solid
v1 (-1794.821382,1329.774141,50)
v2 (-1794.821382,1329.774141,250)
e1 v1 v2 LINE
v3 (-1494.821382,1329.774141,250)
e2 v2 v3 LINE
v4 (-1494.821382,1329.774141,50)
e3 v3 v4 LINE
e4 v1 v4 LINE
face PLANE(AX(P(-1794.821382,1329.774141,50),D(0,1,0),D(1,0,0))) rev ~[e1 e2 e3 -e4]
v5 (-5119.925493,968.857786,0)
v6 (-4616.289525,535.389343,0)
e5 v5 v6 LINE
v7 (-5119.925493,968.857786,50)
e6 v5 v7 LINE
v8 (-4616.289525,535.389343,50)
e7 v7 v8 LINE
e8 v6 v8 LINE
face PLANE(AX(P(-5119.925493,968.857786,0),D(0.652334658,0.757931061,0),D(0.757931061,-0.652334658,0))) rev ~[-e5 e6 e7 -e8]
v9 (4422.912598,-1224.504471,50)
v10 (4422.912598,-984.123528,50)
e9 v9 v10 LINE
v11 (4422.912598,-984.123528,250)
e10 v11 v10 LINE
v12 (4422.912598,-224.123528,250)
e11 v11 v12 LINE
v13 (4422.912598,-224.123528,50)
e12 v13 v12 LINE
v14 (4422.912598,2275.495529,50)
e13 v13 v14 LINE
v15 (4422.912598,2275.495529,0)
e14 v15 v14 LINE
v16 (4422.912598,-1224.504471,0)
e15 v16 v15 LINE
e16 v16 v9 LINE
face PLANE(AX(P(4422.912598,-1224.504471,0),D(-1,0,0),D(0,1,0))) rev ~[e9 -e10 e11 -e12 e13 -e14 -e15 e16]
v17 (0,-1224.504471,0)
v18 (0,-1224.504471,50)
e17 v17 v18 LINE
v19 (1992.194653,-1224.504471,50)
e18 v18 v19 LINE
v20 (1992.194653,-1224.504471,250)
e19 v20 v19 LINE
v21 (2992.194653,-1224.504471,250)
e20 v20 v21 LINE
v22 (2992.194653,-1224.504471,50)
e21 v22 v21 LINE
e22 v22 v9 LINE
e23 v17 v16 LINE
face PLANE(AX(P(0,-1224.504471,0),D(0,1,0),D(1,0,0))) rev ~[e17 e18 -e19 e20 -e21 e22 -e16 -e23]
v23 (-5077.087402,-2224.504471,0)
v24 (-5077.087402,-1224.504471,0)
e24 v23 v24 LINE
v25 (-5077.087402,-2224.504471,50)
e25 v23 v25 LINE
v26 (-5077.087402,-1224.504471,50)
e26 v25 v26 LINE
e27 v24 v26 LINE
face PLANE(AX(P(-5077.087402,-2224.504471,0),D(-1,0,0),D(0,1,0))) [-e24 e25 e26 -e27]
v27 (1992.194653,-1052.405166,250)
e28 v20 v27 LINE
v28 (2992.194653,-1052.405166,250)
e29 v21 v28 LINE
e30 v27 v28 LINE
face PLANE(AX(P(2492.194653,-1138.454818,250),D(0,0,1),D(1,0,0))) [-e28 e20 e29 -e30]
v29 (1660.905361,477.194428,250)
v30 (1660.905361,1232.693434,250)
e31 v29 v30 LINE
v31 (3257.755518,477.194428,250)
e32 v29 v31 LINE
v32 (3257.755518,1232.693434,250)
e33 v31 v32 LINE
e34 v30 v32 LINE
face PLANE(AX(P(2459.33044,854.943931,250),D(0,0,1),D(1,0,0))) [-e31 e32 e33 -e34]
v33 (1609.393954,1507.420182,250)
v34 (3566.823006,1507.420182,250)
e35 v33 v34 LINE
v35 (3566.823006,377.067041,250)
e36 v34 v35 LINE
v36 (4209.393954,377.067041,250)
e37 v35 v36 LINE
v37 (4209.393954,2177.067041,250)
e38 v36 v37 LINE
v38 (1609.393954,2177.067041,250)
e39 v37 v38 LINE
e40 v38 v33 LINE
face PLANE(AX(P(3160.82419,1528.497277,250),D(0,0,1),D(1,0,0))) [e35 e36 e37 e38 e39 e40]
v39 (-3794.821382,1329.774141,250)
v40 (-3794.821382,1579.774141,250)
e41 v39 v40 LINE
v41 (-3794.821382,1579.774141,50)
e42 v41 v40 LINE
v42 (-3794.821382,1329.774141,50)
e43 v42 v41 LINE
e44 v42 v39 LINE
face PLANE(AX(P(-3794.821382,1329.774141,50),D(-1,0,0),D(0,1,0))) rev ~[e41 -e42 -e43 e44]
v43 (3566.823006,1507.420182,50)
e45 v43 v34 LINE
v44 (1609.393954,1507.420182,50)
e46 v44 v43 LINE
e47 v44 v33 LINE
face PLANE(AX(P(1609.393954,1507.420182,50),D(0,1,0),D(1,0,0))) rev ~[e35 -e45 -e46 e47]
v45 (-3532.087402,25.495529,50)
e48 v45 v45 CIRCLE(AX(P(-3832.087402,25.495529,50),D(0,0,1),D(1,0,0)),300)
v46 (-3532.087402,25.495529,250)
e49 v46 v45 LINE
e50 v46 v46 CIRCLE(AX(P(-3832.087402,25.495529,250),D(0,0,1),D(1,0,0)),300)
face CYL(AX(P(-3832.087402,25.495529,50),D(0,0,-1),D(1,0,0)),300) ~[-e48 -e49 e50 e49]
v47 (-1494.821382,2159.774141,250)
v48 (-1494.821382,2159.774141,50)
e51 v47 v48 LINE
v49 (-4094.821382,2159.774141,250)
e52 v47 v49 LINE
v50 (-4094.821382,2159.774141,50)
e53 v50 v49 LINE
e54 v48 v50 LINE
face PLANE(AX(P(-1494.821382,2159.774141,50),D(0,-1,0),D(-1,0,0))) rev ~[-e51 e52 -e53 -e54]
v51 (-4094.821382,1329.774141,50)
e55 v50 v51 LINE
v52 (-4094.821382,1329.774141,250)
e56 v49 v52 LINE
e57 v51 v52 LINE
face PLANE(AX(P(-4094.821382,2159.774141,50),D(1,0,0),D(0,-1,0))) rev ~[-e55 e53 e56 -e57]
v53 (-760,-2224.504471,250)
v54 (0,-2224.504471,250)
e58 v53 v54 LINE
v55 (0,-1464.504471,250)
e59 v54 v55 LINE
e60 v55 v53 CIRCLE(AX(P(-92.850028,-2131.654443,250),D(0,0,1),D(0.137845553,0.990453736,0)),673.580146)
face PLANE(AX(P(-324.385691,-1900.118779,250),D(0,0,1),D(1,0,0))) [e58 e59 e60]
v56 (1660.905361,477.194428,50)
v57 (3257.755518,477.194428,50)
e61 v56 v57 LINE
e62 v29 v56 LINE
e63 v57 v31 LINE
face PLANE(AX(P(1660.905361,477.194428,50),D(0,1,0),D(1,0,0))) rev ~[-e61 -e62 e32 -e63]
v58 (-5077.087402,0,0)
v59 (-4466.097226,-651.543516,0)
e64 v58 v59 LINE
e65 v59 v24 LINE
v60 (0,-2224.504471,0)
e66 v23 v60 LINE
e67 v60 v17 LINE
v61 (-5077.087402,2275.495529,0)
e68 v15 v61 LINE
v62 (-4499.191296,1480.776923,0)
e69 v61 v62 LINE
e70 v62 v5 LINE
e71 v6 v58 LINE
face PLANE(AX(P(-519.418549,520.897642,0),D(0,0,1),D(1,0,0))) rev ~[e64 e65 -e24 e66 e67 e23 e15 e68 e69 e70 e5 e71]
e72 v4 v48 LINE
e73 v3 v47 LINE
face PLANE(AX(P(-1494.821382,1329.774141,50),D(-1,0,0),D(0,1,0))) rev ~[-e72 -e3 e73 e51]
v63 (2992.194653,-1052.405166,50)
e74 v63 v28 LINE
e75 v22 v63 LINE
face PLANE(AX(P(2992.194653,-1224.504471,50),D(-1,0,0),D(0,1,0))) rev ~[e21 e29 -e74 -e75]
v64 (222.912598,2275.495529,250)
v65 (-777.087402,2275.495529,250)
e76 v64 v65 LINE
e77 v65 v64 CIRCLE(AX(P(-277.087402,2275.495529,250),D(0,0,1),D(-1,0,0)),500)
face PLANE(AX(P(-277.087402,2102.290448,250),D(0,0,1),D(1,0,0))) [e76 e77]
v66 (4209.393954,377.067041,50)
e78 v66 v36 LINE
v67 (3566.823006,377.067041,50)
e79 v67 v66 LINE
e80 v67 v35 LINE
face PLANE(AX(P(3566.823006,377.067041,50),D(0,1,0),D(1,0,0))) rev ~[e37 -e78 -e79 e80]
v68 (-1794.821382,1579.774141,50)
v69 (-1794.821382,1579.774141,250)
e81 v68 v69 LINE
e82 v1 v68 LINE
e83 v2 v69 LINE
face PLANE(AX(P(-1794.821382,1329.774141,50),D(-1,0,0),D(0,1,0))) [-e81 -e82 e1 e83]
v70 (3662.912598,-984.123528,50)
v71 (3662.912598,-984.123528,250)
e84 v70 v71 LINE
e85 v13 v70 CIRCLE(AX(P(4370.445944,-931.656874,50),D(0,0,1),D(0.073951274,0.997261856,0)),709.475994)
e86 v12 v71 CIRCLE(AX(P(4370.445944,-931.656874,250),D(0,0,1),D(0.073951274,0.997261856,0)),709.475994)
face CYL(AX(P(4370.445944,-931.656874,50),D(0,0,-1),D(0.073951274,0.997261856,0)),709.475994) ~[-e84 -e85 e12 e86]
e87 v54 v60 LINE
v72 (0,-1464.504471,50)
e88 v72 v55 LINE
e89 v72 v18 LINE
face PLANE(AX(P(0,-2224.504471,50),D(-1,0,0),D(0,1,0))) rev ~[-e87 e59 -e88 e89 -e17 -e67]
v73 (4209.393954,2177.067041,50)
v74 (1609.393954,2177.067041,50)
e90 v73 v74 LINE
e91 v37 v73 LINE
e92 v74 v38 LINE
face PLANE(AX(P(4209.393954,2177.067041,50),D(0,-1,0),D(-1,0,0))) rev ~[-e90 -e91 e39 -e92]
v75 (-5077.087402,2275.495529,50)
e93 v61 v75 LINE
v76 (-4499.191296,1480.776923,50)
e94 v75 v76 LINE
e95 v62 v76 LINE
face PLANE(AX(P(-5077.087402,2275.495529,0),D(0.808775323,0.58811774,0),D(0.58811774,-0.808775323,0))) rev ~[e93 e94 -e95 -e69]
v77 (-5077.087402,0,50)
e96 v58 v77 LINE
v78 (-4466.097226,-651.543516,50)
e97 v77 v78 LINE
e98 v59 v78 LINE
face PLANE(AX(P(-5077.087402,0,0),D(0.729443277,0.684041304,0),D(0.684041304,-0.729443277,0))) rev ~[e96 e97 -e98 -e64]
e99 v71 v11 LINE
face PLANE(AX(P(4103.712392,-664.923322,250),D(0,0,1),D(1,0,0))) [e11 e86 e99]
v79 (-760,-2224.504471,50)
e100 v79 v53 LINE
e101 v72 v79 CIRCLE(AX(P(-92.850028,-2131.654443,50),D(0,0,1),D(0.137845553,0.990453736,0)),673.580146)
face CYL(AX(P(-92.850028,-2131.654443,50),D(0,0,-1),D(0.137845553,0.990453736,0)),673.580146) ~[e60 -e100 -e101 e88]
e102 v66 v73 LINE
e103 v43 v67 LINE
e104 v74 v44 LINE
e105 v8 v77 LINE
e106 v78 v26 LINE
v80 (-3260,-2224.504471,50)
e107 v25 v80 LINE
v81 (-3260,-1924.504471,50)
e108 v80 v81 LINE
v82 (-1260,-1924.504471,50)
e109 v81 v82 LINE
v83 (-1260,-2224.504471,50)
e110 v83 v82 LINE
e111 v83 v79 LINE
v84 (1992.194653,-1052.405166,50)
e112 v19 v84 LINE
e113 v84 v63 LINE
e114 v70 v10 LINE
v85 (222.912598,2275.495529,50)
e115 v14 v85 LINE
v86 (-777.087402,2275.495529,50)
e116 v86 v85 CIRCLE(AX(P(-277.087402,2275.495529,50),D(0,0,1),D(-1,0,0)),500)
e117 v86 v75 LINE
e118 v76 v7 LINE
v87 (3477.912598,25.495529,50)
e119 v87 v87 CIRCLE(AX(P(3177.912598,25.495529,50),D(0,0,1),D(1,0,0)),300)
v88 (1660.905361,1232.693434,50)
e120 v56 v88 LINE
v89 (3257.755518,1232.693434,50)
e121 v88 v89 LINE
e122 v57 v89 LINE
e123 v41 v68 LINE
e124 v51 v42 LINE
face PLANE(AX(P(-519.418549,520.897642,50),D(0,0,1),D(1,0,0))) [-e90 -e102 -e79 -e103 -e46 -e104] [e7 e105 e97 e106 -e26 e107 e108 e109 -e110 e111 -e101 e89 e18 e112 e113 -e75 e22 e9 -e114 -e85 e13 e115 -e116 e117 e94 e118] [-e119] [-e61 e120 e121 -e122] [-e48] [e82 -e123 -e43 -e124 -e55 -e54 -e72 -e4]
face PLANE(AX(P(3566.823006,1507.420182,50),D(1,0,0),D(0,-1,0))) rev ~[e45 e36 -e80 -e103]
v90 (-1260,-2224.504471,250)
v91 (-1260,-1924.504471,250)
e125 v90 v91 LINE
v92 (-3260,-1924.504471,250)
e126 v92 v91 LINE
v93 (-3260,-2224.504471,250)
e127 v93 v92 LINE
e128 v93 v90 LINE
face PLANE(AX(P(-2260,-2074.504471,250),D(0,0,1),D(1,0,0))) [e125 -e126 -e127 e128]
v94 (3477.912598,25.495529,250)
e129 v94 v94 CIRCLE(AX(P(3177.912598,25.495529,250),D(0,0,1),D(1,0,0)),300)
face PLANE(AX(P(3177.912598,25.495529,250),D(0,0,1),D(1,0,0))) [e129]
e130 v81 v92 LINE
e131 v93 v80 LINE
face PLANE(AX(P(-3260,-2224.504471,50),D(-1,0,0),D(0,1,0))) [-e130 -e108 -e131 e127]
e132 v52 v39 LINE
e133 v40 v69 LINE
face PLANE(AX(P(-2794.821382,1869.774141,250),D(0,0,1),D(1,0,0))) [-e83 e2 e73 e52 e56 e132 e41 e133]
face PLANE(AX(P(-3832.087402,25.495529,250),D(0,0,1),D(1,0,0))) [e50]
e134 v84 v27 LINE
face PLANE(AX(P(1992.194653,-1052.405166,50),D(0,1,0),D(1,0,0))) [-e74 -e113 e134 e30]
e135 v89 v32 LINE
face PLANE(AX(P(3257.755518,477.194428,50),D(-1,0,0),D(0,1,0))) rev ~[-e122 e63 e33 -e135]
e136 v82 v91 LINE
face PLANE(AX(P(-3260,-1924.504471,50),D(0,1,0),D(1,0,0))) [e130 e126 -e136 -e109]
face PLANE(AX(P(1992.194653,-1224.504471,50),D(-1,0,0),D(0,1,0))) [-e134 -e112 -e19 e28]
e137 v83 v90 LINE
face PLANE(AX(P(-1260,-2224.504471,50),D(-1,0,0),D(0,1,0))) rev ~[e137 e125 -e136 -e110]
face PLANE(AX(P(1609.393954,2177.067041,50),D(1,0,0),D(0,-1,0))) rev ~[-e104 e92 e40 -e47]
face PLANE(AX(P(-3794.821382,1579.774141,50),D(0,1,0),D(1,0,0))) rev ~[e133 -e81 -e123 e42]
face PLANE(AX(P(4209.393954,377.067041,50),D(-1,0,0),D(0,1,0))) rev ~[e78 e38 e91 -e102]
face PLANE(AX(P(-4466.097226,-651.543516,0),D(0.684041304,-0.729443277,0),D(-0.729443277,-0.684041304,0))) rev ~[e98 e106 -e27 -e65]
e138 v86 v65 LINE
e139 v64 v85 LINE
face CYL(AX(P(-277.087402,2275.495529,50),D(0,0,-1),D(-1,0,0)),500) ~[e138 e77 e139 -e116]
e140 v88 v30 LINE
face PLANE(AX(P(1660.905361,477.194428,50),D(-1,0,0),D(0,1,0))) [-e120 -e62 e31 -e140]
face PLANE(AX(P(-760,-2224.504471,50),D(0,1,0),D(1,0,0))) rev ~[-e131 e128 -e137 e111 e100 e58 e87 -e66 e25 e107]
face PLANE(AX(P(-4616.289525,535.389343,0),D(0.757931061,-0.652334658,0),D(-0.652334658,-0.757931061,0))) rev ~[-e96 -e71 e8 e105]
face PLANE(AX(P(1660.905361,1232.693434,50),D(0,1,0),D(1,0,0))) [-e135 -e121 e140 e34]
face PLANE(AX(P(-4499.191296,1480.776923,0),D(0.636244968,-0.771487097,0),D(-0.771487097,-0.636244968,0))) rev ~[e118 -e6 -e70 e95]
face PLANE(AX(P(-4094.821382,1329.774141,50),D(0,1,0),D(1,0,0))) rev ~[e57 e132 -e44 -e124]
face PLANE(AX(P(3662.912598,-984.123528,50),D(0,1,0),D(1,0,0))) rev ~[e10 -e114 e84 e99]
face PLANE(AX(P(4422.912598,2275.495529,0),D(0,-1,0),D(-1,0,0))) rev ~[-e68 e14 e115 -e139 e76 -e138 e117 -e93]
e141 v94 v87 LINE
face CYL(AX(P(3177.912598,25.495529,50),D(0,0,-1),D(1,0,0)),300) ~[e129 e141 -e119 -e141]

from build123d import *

# Parameters (mm, degrees)
F0_W      = 5077.0874023438
F0_H      = 1000
F1_DEPTH  = 50
F2_W      = 300
F2_H      = 250
F2_W_2    = 1596.8501567841
F2_H_2    = 755.4990053177
F2_W_3    = 1000
F2_H_3    = 172.0993051472
F2_W_4    = 2000
F2_H_4    = 300
F2_R      = 300
F3_DEPTH  = 200
F4_DEPTH  = 200
F5_DEPTH  = 200
F6_DEPTH  = 200
F7_DEPTH  = 200
F8_DEPTH  = 200
F10_DEPTH = 25


# Not quite as in the source:
# - the program builds the solid bodies; features that only make, move or delete a surface that nothing else refers to are left out


with BuildPart() as f1:
    # F0 (on Top) → F1 (new body)
    with BuildSketch(Plane.XY):
        Polygon((-777.0874023438, 2275.4955291748), (-5077.0874023438, 2275.4955291748), (-4499.191295666, 1480.7769234966), (-5119.9254926672, 968.8577861197), (-4616.2895248949, 535.3893431642), (-5077.0874023438, 0), (-4466.0972264549, -651.5435160618), (-5077.0874023438, -1224.5044708252), (0, -1224.5044708252), (4422.9125976562, -1224.5044708252), (4422.9125976562, 2275.4955291748), (222.9125976562, 2275.4955291748), align=None)
        with Locations((-2538.5437011719, -1724.5044708252)):
            Rectangle(F0_W, F0_H)
    extrude(amount=F1_DEPTH)

    # F2 (on face) → F3 (join)
    with BuildSketch(Plane.XY.offset(50)):
        Polygon((-1494.8213815689, 2159.7741413116), (-4094.8213815689, 2159.7741413116), (-4094.8213815689, 1579.7741413116), (-3794.8213815689, 1579.7741413116), (-1794.8213815689, 1579.7741413116), (-1494.8213815689, 1579.7741413116), align=None)
        with Locations((-3944.8213815689, 1454.7741413116)):
            Rectangle(F2_W, F2_H)
        with Locations((-1644.8213815689, 1454.7741413116)):
            Rectangle(F2_W, F2_H)
        Polygon((4209.393954277, 2177.0670413971), (1609.393954277, 2177.0670413971), (1609.393954277, 1507.4201822281), (3566.8230056763, 1507.4201822281), (3566.8230056763, 377.0670413971), (4209.393954277, 377.0670413971), align=None)
        with Locations((2459.3304395676, 854.9439311028)):
            Rectangle(F2_W_2, F2_H_2)
        with Locations((2492.1946525574, -1138.4548182516)):
            Rectangle(F2_W_3, F2_H_3)
        with BuildLine():
            Line((222.9125976562, 2275.4955291748), (-777.0874023438, 2275.4955291748))
            ThreePointArc((-777.0874023438, 2275.4955291748), (-277.0874023438, 1775.4955291748), (222.9125976562, 2275.4955291748))
        make_face()
        with BuildLine():
            Line((3662.9125976562, -984.1235280037), (4422.9125976562, -984.1235280037))
            Line((4422.9125976562, -984.1235280037), (4422.9125976562, -224.1235280037))
            ThreePointArc((4422.9125976562, -224.1235280037), (3868.7706575404, -429.9815878879), (3662.9125976562, -984.1235280037))
        make_face()
        with Locations((-2260, -2074.5044708252)):
            Rectangle(F2_W_4, F2_H_4)
        with BuildLine():
            Line((-760, -2224.5044708252), (0, -2224.5044708252))
            Line((0, -2224.5044708252), (0, -1464.5044708252))
            ThreePointArc((0, -1464.5044708252), (-569.1431166961, -1655.361354129), (-760, -2224.5044708252))
        make_face()
        with Locations((-3832.0874023438, 25.4955291748)):
            Circle(F2_R)
        with Locations((3177.9125976562, 25.4955291748)):
            Circle(F2_R)
    extrude(amount=F3_DEPTH)

    # F2 (on face) → F4 (join)
    with BuildSketch(Plane.XY.offset(50)):
        Polygon((-1494.8213815689, 2159.7741413116), (-4094.8213815689, 2159.7741413116), (-4094.8213815689, 1579.7741413116), (-3794.8213815689, 1579.7741413116), (-1794.8213815689, 1579.7741413116), (-1494.8213815689, 1579.7741413116), align=None)
        with Locations((-3944.8213815689, 1454.7741413116)):
            Rectangle(F2_W, F2_H)
        with Locations((-1644.8213815689, 1454.7741413116)):
            Rectangle(F2_W, F2_H)
        Polygon((4209.393954277, 2177.0670413971), (1609.393954277, 2177.0670413971), (1609.393954277, 1507.4201822281), (3566.8230056763, 1507.4201822281), (3566.8230056763, 377.0670413971), (4209.393954277, 377.0670413971), align=None)
        with Locations((2459.3304395676, 854.9439311028)):
            Rectangle(F2_W_2, F2_H_2)
        with Locations((2492.1946525574, -1138.4548182516)):
            Rectangle(F2_W_3, F2_H_3)
        with BuildLine():
            Line((222.9125976562, 2275.4955291748), (-777.0874023438, 2275.4955291748))
            ThreePointArc((-777.0874023438, 2275.4955291748), (-277.0874023438, 1775.4955291748), (222.9125976562, 2275.4955291748))
        make_face()
        with BuildLine():
            Line((3662.9125976562, -984.1235280037), (4422.9125976562, -984.1235280037))
            Line((4422.9125976562, -984.1235280037), (4422.9125976562, -224.1235280037))
            ThreePointArc((4422.9125976562, -224.1235280037), (3868.7706575404, -429.9815878879), (3662.9125976562, -984.1235280037))
        make_face()
        with Locations((-2260, -2074.5044708252)):
            Rectangle(F2_W_4, F2_H_4)
        with BuildLine():
            Line((-760, -2224.5044708252), (0, -2224.5044708252))
            Line((0, -2224.5044708252), (0, -1464.5044708252))
            ThreePointArc((0, -1464.5044708252), (-569.1431166961, -1655.361354129), (-760, -2224.5044708252))
        make_face()
        with Locations((-3832.0874023438, 25.4955291748)):
            Circle(F2_R)
        with Locations((3177.9125976562, 25.4955291748)):
            Circle(F2_R)
    extrude(amount=F4_DEPTH)

    # F2 (on face) → F5 (join)
    with BuildSketch(Plane.XY.offset(50)):
        Polygon((-1494.8213815689, 2159.7741413116), (-4094.8213815689, 2159.7741413116), (-4094.8213815689, 1579.7741413116), (-3794.8213815689, 1579.7741413116), (-1794.8213815689, 1579.7741413116), (-1494.8213815689, 1579.7741413116), align=None)
        with Locations((-3944.8213815689, 1454.7741413116)):
            Rectangle(F2_W, F2_H)
        with Locations((-1644.8213815689, 1454.7741413116)):
            Rectangle(F2_W, F2_H)
        Polygon((4209.393954277, 2177.0670413971), (1609.393954277, 2177.0670413971), (1609.393954277, 1507.4201822281), (3566.8230056763, 1507.4201822281), (3566.8230056763, 377.0670413971), (4209.393954277, 377.0670413971), align=None)
        with Locations((2459.3304395676, 854.9439311028)):
            Rectangle(F2_W_2, F2_H_2)
        with Locations((2492.1946525574, -1138.4548182516)):
            Rectangle(F2_W_3, F2_H_3)
        with BuildLine():
            Line((222.9125976562, 2275.4955291748), (-777.0874023438, 2275.4955291748))
            ThreePointArc((-777.0874023438, 2275.4955291748), (-277.0874023438, 1775.4955291748), (222.9125976562, 2275.4955291748))
        make_face()
        with BuildLine():
            Line((3662.9125976562, -984.1235280037), (4422.9125976562, -984.1235280037))
            Line((4422.9125976562, -984.1235280037), (4422.9125976562, -224.1235280037))
            ThreePointArc((4422.9125976562, -224.1235280037), (3868.7706575404, -429.9815878879), (3662.9125976562, -984.1235280037))
        make_face()
        with Locations((-2260, -2074.5044708252)):
            Rectangle(F2_W_4, F2_H_4)
        with BuildLine():
            Line((-760, -2224.5044708252), (0, -2224.5044708252))
            Line((0, -2224.5044708252), (0, -1464.5044708252))
            ThreePointArc((0, -1464.5044708252), (-569.1431166961, -1655.361354129), (-760, -2224.5044708252))
        make_face()
        with Locations((-3832.0874023438, 25.4955291748)):
            Circle(F2_R)
        with Locations((3177.9125976562, 25.4955291748)):
            Circle(F2_R)
    extrude(amount=F5_DEPTH)

    # F2 (on face) → F6 (join)
    with BuildSketch(Plane.XY.offset(50)):
        Polygon((-1494.8213815689, 2159.7741413116), (-4094.8213815689, 2159.7741413116), (-4094.8213815689, 1579.7741413116), (-3794.8213815689, 1579.7741413116), (-1794.8213815689, 1579.7741413116), (-1494.8213815689, 1579.7741413116), align=None)
        with Locations((-3944.8213815689, 1454.7741413116)):
            Rectangle(F2_W, F2_H)
        with Locations((-1644.8213815689, 1454.7741413116)):
            Rectangle(F2_W, F2_H)
        Polygon((4209.393954277, 2177.0670413971), (1609.393954277, 2177.0670413971), (1609.393954277, 1507.4201822281), (3566.8230056763, 1507.4201822281), (3566.8230056763, 377.0670413971), (4209.393954277, 377.0670413971), align=None)
        with Locations((2459.3304395676, 854.9439311028)):
            Rectangle(F2_W_2, F2_H_2)
        with Locations((2492.1946525574, -1138.4548182516)):
            Rectangle(F2_W_3, F2_H_3)
        with BuildLine():
            Line((222.9125976562, 2275.4955291748), (-777.0874023438, 2275.4955291748))
            ThreePointArc((-777.0874023438, 2275.4955291748), (-277.0874023438, 1775.4955291748), (222.9125976562, 2275.4955291748))
        make_face()
        with BuildLine():
            Line((3662.9125976562, -984.1235280037), (4422.9125976562, -984.1235280037))
            Line((4422.9125976562, -984.1235280037), (4422.9125976562, -224.1235280037))
            ThreePointArc((4422.9125976562, -224.1235280037), (3868.7706575404, -429.9815878879), (3662.9125976562, -984.1235280037))
        make_face()
        with Locations((-2260, -2074.5044708252)):
            Rectangle(F2_W_4, F2_H_4)
        with BuildLine():
            Line((-760, -2224.5044708252), (0, -2224.5044708252))
            Line((0, -2224.5044708252), (0, -1464.5044708252))
            ThreePointArc((0, -1464.5044708252), (-569.1431166961, -1655.361354129), (-760, -2224.5044708252))
        make_face()
        with Locations((-3832.0874023438, 25.4955291748)):
            Circle(F2_R)
        with Locations((3177.9125976562, 25.4955291748)):
            Circle(F2_R)
    extrude(amount=F6_DEPTH)

    # F2 (on face) → F7 (join)
    with BuildSketch(Plane.XY.offset(50)):
        Polygon((-1494.8213815689, 2159.7741413116), (-4094.8213815689, 2159.7741413116), (-4094.8213815689, 1579.7741413116), (-3794.8213815689, 1579.7741413116), (-1794.8213815689, 1579.7741413116), (-1494.8213815689, 1579.7741413116), align=None)
        with Locations((-3944.8213815689, 1454.7741413116)):
            Rectangle(F2_W, F2_H)
        with Locations((-1644.8213815689, 1454.7741413116)):
            Rectangle(F2_W, F2_H)
        Polygon((4209.393954277, 2177.0670413971), (1609.393954277, 2177.0670413971), (1609.393954277, 1507.4201822281), (3566.8230056763, 1507.4201822281), (3566.8230056763, 377.0670413971), (4209.393954277, 377.0670413971), align=None)
        with Locations((2459.3304395676, 854.9439311028)):
            Rectangle(F2_W_2, F2_H_2)
        with Locations((2492.1946525574, -1138.4548182516)):
            Rectangle(F2_W_3, F2_H_3)
        with BuildLine():
            Line((222.9125976562, 2275.4955291748), (-777.0874023438, 2275.4955291748))
            ThreePointArc((-777.0874023438, 2275.4955291748), (-277.0874023438, 1775.4955291748), (222.9125976562, 2275.4955291748))
        make_face()
        with BuildLine():
            Line((3662.9125976562, -984.1235280037), (4422.9125976562, -984.1235280037))
            Line((4422.9125976562, -984.1235280037), (4422.9125976562, -224.1235280037))
            ThreePointArc((4422.9125976562, -224.1235280037), (3868.7706575404, -429.9815878879), (3662.9125976562, -984.1235280037))
        make_face()
        with Locations((-2260, -2074.5044708252)):
            Rectangle(F2_W_4, F2_H_4)
        with BuildLine():
            Line((-760, -2224.5044708252), (0, -2224.5044708252))
            Line((0, -2224.5044708252), (0, -1464.5044708252))
            ThreePointArc((0, -1464.5044708252), (-569.1431166961, -1655.361354129), (-760, -2224.5044708252))
        make_face()
        with Locations((-3832.0874023438, 25.4955291748)):
            Circle(F2_R)
        with Locations((3177.9125976562, 25.4955291748)):
            Circle(F2_R)
    extrude(amount=F7_DEPTH)

    # F2 (on face) → F8 (join)
    with BuildSketch(Plane.XY.offset(50)):
        Polygon((-1494.8213815689, 2159.7741413116), (-4094.8213815689, 2159.7741413116), (-4094.8213815689, 1579.7741413116), (-3794.8213815689, 1579.7741413116), (-1794.8213815689, 1579.7741413116), (-1494.8213815689, 1579.7741413116), align=None)
        with Locations((-3944.8213815689, 1454.7741413116)):
            Rectangle(F2_W, F2_H)
        with Locations((-1644.8213815689, 1454.7741413116)):
            Rectangle(F2_W, F2_H)
        Polygon((4209.393954277, 2177.0670413971), (1609.393954277, 2177.0670413971), (1609.393954277, 1507.4201822281), (3566.8230056763, 1507.4201822281), (3566.8230056763, 377.0670413971), (4209.393954277, 377.0670413971), align=None)
        with Locations((2459.3304395676, 854.9439311028)):
            Rectangle(F2_W_2, F2_H_2)
        with Locations((2492.1946525574, -1138.4548182516)):
            Rectangle(F2_W_3, F2_H_3)
        with BuildLine():
            Line((222.9125976562, 2275.4955291748), (-777.0874023438, 2275.4955291748))
            ThreePointArc((-777.0874023438, 2275.4955291748), (-277.0874023438, 1775.4955291748), (222.9125976562, 2275.4955291748))
        make_face()
        with BuildLine():
            Line((3662.9125976562, -984.1235280037), (4422.9125976562, -984.1235280037))
            Line((4422.9125976562, -984.1235280037), (4422.9125976562, -224.1235280037))
            ThreePointArc((4422.9125976562, -224.1235280037), (3868.7706575404, -429.9815878879), (3662.9125976562, -984.1235280037))
        make_face()
        with Locations((-2260, -2074.5044708252)):
            Rectangle(F2_W_4, F2_H_4)
        with BuildLine():
            Line((-760, -2224.5044708252), (0, -2224.5044708252))
            Line((0, -2224.5044708252), (0, -1464.5044708252))
            ThreePointArc((0, -1464.5044708252), (-569.1431166961, -1655.361354129), (-760, -2224.5044708252))
        make_face()
        with Locations((-3832.0874023438, 25.4955291748)):
            Circle(F2_R)
        with Locations((3177.9125976562, 25.4955291748)):
            Circle(F2_R)
    extrude(amount=F8_DEPTH)

    # F2 (on face) → F10 (join)
    with BuildSketch(Plane.XY.offset(50)):
        Polygon((-1494.8213815689, 2159.7741413116), (-4094.8213815689, 2159.7741413116), (-4094.8213815689, 1579.7741413116), (-3794.8213815689, 1579.7741413116), (-1794.8213815689, 1579.7741413116), (-1494.8213815689, 1579.7741413116), align=None)
        with Locations((-3944.8213815689, 1454.7741413116)):
            Rectangle(F2_W, F2_H)
        with Locations((-1644.8213815689, 1454.7741413116)):
            Rectangle(F2_W, F2_H)
        Polygon((4209.393954277, 2177.0670413971), (1609.393954277, 2177.0670413971), (1609.393954277, 1507.4201822281), (3566.8230056763, 1507.4201822281), (3566.8230056763, 377.0670413971), (4209.393954277, 377.0670413971), align=None)
        with Locations((2459.3304395676, 854.9439311028)):
            Rectangle(F2_W_2, F2_H_2)
        with Locations((2492.1946525574, -1138.4548182516)):
            Rectangle(F2_W_3, F2_H_3)
        with BuildLine():
            Line((222.9125976562, 2275.4955291748), (-777.0874023438, 2275.4955291748))
            ThreePointArc((-777.0874023438, 2275.4955291748), (-277.0874023438, 1775.4955291748), (222.9125976562, 2275.4955291748))
        make_face()
        with BuildLine():
            Line((3662.9125976562, -984.1235280037), (4422.9125976562, -984.1235280037))
            Line((4422.9125976562, -984.1235280037), (4422.9125976562, -224.1235280037))
            ThreePointArc((4422.9125976562, -224.1235280037), (3868.7706575404, -429.9815878879), (3662.9125976562, -984.1235280037))
        make_face()
        with Locations((-2260, -2074.5044708252)):
            Rectangle(F2_W_4, F2_H_4)
        with BuildLine():
            Line((-760, -2224.5044708252), (0, -2224.5044708252))
            Line((0, -2224.5044708252), (0, -1464.5044708252))
            ThreePointArc((0, -1464.5044708252), (-569.1431166961, -1655.361354129), (-760, -2224.5044708252))
        make_face()
        with Locations((-3832.0874023438, 25.4955291748)):
            Circle(F2_R)
        with Locations((3177.9125976562, 25.4955291748)):
            Circle(F2_R)
    extrude(amount=F10_DEPTH)


solid = f1.part
